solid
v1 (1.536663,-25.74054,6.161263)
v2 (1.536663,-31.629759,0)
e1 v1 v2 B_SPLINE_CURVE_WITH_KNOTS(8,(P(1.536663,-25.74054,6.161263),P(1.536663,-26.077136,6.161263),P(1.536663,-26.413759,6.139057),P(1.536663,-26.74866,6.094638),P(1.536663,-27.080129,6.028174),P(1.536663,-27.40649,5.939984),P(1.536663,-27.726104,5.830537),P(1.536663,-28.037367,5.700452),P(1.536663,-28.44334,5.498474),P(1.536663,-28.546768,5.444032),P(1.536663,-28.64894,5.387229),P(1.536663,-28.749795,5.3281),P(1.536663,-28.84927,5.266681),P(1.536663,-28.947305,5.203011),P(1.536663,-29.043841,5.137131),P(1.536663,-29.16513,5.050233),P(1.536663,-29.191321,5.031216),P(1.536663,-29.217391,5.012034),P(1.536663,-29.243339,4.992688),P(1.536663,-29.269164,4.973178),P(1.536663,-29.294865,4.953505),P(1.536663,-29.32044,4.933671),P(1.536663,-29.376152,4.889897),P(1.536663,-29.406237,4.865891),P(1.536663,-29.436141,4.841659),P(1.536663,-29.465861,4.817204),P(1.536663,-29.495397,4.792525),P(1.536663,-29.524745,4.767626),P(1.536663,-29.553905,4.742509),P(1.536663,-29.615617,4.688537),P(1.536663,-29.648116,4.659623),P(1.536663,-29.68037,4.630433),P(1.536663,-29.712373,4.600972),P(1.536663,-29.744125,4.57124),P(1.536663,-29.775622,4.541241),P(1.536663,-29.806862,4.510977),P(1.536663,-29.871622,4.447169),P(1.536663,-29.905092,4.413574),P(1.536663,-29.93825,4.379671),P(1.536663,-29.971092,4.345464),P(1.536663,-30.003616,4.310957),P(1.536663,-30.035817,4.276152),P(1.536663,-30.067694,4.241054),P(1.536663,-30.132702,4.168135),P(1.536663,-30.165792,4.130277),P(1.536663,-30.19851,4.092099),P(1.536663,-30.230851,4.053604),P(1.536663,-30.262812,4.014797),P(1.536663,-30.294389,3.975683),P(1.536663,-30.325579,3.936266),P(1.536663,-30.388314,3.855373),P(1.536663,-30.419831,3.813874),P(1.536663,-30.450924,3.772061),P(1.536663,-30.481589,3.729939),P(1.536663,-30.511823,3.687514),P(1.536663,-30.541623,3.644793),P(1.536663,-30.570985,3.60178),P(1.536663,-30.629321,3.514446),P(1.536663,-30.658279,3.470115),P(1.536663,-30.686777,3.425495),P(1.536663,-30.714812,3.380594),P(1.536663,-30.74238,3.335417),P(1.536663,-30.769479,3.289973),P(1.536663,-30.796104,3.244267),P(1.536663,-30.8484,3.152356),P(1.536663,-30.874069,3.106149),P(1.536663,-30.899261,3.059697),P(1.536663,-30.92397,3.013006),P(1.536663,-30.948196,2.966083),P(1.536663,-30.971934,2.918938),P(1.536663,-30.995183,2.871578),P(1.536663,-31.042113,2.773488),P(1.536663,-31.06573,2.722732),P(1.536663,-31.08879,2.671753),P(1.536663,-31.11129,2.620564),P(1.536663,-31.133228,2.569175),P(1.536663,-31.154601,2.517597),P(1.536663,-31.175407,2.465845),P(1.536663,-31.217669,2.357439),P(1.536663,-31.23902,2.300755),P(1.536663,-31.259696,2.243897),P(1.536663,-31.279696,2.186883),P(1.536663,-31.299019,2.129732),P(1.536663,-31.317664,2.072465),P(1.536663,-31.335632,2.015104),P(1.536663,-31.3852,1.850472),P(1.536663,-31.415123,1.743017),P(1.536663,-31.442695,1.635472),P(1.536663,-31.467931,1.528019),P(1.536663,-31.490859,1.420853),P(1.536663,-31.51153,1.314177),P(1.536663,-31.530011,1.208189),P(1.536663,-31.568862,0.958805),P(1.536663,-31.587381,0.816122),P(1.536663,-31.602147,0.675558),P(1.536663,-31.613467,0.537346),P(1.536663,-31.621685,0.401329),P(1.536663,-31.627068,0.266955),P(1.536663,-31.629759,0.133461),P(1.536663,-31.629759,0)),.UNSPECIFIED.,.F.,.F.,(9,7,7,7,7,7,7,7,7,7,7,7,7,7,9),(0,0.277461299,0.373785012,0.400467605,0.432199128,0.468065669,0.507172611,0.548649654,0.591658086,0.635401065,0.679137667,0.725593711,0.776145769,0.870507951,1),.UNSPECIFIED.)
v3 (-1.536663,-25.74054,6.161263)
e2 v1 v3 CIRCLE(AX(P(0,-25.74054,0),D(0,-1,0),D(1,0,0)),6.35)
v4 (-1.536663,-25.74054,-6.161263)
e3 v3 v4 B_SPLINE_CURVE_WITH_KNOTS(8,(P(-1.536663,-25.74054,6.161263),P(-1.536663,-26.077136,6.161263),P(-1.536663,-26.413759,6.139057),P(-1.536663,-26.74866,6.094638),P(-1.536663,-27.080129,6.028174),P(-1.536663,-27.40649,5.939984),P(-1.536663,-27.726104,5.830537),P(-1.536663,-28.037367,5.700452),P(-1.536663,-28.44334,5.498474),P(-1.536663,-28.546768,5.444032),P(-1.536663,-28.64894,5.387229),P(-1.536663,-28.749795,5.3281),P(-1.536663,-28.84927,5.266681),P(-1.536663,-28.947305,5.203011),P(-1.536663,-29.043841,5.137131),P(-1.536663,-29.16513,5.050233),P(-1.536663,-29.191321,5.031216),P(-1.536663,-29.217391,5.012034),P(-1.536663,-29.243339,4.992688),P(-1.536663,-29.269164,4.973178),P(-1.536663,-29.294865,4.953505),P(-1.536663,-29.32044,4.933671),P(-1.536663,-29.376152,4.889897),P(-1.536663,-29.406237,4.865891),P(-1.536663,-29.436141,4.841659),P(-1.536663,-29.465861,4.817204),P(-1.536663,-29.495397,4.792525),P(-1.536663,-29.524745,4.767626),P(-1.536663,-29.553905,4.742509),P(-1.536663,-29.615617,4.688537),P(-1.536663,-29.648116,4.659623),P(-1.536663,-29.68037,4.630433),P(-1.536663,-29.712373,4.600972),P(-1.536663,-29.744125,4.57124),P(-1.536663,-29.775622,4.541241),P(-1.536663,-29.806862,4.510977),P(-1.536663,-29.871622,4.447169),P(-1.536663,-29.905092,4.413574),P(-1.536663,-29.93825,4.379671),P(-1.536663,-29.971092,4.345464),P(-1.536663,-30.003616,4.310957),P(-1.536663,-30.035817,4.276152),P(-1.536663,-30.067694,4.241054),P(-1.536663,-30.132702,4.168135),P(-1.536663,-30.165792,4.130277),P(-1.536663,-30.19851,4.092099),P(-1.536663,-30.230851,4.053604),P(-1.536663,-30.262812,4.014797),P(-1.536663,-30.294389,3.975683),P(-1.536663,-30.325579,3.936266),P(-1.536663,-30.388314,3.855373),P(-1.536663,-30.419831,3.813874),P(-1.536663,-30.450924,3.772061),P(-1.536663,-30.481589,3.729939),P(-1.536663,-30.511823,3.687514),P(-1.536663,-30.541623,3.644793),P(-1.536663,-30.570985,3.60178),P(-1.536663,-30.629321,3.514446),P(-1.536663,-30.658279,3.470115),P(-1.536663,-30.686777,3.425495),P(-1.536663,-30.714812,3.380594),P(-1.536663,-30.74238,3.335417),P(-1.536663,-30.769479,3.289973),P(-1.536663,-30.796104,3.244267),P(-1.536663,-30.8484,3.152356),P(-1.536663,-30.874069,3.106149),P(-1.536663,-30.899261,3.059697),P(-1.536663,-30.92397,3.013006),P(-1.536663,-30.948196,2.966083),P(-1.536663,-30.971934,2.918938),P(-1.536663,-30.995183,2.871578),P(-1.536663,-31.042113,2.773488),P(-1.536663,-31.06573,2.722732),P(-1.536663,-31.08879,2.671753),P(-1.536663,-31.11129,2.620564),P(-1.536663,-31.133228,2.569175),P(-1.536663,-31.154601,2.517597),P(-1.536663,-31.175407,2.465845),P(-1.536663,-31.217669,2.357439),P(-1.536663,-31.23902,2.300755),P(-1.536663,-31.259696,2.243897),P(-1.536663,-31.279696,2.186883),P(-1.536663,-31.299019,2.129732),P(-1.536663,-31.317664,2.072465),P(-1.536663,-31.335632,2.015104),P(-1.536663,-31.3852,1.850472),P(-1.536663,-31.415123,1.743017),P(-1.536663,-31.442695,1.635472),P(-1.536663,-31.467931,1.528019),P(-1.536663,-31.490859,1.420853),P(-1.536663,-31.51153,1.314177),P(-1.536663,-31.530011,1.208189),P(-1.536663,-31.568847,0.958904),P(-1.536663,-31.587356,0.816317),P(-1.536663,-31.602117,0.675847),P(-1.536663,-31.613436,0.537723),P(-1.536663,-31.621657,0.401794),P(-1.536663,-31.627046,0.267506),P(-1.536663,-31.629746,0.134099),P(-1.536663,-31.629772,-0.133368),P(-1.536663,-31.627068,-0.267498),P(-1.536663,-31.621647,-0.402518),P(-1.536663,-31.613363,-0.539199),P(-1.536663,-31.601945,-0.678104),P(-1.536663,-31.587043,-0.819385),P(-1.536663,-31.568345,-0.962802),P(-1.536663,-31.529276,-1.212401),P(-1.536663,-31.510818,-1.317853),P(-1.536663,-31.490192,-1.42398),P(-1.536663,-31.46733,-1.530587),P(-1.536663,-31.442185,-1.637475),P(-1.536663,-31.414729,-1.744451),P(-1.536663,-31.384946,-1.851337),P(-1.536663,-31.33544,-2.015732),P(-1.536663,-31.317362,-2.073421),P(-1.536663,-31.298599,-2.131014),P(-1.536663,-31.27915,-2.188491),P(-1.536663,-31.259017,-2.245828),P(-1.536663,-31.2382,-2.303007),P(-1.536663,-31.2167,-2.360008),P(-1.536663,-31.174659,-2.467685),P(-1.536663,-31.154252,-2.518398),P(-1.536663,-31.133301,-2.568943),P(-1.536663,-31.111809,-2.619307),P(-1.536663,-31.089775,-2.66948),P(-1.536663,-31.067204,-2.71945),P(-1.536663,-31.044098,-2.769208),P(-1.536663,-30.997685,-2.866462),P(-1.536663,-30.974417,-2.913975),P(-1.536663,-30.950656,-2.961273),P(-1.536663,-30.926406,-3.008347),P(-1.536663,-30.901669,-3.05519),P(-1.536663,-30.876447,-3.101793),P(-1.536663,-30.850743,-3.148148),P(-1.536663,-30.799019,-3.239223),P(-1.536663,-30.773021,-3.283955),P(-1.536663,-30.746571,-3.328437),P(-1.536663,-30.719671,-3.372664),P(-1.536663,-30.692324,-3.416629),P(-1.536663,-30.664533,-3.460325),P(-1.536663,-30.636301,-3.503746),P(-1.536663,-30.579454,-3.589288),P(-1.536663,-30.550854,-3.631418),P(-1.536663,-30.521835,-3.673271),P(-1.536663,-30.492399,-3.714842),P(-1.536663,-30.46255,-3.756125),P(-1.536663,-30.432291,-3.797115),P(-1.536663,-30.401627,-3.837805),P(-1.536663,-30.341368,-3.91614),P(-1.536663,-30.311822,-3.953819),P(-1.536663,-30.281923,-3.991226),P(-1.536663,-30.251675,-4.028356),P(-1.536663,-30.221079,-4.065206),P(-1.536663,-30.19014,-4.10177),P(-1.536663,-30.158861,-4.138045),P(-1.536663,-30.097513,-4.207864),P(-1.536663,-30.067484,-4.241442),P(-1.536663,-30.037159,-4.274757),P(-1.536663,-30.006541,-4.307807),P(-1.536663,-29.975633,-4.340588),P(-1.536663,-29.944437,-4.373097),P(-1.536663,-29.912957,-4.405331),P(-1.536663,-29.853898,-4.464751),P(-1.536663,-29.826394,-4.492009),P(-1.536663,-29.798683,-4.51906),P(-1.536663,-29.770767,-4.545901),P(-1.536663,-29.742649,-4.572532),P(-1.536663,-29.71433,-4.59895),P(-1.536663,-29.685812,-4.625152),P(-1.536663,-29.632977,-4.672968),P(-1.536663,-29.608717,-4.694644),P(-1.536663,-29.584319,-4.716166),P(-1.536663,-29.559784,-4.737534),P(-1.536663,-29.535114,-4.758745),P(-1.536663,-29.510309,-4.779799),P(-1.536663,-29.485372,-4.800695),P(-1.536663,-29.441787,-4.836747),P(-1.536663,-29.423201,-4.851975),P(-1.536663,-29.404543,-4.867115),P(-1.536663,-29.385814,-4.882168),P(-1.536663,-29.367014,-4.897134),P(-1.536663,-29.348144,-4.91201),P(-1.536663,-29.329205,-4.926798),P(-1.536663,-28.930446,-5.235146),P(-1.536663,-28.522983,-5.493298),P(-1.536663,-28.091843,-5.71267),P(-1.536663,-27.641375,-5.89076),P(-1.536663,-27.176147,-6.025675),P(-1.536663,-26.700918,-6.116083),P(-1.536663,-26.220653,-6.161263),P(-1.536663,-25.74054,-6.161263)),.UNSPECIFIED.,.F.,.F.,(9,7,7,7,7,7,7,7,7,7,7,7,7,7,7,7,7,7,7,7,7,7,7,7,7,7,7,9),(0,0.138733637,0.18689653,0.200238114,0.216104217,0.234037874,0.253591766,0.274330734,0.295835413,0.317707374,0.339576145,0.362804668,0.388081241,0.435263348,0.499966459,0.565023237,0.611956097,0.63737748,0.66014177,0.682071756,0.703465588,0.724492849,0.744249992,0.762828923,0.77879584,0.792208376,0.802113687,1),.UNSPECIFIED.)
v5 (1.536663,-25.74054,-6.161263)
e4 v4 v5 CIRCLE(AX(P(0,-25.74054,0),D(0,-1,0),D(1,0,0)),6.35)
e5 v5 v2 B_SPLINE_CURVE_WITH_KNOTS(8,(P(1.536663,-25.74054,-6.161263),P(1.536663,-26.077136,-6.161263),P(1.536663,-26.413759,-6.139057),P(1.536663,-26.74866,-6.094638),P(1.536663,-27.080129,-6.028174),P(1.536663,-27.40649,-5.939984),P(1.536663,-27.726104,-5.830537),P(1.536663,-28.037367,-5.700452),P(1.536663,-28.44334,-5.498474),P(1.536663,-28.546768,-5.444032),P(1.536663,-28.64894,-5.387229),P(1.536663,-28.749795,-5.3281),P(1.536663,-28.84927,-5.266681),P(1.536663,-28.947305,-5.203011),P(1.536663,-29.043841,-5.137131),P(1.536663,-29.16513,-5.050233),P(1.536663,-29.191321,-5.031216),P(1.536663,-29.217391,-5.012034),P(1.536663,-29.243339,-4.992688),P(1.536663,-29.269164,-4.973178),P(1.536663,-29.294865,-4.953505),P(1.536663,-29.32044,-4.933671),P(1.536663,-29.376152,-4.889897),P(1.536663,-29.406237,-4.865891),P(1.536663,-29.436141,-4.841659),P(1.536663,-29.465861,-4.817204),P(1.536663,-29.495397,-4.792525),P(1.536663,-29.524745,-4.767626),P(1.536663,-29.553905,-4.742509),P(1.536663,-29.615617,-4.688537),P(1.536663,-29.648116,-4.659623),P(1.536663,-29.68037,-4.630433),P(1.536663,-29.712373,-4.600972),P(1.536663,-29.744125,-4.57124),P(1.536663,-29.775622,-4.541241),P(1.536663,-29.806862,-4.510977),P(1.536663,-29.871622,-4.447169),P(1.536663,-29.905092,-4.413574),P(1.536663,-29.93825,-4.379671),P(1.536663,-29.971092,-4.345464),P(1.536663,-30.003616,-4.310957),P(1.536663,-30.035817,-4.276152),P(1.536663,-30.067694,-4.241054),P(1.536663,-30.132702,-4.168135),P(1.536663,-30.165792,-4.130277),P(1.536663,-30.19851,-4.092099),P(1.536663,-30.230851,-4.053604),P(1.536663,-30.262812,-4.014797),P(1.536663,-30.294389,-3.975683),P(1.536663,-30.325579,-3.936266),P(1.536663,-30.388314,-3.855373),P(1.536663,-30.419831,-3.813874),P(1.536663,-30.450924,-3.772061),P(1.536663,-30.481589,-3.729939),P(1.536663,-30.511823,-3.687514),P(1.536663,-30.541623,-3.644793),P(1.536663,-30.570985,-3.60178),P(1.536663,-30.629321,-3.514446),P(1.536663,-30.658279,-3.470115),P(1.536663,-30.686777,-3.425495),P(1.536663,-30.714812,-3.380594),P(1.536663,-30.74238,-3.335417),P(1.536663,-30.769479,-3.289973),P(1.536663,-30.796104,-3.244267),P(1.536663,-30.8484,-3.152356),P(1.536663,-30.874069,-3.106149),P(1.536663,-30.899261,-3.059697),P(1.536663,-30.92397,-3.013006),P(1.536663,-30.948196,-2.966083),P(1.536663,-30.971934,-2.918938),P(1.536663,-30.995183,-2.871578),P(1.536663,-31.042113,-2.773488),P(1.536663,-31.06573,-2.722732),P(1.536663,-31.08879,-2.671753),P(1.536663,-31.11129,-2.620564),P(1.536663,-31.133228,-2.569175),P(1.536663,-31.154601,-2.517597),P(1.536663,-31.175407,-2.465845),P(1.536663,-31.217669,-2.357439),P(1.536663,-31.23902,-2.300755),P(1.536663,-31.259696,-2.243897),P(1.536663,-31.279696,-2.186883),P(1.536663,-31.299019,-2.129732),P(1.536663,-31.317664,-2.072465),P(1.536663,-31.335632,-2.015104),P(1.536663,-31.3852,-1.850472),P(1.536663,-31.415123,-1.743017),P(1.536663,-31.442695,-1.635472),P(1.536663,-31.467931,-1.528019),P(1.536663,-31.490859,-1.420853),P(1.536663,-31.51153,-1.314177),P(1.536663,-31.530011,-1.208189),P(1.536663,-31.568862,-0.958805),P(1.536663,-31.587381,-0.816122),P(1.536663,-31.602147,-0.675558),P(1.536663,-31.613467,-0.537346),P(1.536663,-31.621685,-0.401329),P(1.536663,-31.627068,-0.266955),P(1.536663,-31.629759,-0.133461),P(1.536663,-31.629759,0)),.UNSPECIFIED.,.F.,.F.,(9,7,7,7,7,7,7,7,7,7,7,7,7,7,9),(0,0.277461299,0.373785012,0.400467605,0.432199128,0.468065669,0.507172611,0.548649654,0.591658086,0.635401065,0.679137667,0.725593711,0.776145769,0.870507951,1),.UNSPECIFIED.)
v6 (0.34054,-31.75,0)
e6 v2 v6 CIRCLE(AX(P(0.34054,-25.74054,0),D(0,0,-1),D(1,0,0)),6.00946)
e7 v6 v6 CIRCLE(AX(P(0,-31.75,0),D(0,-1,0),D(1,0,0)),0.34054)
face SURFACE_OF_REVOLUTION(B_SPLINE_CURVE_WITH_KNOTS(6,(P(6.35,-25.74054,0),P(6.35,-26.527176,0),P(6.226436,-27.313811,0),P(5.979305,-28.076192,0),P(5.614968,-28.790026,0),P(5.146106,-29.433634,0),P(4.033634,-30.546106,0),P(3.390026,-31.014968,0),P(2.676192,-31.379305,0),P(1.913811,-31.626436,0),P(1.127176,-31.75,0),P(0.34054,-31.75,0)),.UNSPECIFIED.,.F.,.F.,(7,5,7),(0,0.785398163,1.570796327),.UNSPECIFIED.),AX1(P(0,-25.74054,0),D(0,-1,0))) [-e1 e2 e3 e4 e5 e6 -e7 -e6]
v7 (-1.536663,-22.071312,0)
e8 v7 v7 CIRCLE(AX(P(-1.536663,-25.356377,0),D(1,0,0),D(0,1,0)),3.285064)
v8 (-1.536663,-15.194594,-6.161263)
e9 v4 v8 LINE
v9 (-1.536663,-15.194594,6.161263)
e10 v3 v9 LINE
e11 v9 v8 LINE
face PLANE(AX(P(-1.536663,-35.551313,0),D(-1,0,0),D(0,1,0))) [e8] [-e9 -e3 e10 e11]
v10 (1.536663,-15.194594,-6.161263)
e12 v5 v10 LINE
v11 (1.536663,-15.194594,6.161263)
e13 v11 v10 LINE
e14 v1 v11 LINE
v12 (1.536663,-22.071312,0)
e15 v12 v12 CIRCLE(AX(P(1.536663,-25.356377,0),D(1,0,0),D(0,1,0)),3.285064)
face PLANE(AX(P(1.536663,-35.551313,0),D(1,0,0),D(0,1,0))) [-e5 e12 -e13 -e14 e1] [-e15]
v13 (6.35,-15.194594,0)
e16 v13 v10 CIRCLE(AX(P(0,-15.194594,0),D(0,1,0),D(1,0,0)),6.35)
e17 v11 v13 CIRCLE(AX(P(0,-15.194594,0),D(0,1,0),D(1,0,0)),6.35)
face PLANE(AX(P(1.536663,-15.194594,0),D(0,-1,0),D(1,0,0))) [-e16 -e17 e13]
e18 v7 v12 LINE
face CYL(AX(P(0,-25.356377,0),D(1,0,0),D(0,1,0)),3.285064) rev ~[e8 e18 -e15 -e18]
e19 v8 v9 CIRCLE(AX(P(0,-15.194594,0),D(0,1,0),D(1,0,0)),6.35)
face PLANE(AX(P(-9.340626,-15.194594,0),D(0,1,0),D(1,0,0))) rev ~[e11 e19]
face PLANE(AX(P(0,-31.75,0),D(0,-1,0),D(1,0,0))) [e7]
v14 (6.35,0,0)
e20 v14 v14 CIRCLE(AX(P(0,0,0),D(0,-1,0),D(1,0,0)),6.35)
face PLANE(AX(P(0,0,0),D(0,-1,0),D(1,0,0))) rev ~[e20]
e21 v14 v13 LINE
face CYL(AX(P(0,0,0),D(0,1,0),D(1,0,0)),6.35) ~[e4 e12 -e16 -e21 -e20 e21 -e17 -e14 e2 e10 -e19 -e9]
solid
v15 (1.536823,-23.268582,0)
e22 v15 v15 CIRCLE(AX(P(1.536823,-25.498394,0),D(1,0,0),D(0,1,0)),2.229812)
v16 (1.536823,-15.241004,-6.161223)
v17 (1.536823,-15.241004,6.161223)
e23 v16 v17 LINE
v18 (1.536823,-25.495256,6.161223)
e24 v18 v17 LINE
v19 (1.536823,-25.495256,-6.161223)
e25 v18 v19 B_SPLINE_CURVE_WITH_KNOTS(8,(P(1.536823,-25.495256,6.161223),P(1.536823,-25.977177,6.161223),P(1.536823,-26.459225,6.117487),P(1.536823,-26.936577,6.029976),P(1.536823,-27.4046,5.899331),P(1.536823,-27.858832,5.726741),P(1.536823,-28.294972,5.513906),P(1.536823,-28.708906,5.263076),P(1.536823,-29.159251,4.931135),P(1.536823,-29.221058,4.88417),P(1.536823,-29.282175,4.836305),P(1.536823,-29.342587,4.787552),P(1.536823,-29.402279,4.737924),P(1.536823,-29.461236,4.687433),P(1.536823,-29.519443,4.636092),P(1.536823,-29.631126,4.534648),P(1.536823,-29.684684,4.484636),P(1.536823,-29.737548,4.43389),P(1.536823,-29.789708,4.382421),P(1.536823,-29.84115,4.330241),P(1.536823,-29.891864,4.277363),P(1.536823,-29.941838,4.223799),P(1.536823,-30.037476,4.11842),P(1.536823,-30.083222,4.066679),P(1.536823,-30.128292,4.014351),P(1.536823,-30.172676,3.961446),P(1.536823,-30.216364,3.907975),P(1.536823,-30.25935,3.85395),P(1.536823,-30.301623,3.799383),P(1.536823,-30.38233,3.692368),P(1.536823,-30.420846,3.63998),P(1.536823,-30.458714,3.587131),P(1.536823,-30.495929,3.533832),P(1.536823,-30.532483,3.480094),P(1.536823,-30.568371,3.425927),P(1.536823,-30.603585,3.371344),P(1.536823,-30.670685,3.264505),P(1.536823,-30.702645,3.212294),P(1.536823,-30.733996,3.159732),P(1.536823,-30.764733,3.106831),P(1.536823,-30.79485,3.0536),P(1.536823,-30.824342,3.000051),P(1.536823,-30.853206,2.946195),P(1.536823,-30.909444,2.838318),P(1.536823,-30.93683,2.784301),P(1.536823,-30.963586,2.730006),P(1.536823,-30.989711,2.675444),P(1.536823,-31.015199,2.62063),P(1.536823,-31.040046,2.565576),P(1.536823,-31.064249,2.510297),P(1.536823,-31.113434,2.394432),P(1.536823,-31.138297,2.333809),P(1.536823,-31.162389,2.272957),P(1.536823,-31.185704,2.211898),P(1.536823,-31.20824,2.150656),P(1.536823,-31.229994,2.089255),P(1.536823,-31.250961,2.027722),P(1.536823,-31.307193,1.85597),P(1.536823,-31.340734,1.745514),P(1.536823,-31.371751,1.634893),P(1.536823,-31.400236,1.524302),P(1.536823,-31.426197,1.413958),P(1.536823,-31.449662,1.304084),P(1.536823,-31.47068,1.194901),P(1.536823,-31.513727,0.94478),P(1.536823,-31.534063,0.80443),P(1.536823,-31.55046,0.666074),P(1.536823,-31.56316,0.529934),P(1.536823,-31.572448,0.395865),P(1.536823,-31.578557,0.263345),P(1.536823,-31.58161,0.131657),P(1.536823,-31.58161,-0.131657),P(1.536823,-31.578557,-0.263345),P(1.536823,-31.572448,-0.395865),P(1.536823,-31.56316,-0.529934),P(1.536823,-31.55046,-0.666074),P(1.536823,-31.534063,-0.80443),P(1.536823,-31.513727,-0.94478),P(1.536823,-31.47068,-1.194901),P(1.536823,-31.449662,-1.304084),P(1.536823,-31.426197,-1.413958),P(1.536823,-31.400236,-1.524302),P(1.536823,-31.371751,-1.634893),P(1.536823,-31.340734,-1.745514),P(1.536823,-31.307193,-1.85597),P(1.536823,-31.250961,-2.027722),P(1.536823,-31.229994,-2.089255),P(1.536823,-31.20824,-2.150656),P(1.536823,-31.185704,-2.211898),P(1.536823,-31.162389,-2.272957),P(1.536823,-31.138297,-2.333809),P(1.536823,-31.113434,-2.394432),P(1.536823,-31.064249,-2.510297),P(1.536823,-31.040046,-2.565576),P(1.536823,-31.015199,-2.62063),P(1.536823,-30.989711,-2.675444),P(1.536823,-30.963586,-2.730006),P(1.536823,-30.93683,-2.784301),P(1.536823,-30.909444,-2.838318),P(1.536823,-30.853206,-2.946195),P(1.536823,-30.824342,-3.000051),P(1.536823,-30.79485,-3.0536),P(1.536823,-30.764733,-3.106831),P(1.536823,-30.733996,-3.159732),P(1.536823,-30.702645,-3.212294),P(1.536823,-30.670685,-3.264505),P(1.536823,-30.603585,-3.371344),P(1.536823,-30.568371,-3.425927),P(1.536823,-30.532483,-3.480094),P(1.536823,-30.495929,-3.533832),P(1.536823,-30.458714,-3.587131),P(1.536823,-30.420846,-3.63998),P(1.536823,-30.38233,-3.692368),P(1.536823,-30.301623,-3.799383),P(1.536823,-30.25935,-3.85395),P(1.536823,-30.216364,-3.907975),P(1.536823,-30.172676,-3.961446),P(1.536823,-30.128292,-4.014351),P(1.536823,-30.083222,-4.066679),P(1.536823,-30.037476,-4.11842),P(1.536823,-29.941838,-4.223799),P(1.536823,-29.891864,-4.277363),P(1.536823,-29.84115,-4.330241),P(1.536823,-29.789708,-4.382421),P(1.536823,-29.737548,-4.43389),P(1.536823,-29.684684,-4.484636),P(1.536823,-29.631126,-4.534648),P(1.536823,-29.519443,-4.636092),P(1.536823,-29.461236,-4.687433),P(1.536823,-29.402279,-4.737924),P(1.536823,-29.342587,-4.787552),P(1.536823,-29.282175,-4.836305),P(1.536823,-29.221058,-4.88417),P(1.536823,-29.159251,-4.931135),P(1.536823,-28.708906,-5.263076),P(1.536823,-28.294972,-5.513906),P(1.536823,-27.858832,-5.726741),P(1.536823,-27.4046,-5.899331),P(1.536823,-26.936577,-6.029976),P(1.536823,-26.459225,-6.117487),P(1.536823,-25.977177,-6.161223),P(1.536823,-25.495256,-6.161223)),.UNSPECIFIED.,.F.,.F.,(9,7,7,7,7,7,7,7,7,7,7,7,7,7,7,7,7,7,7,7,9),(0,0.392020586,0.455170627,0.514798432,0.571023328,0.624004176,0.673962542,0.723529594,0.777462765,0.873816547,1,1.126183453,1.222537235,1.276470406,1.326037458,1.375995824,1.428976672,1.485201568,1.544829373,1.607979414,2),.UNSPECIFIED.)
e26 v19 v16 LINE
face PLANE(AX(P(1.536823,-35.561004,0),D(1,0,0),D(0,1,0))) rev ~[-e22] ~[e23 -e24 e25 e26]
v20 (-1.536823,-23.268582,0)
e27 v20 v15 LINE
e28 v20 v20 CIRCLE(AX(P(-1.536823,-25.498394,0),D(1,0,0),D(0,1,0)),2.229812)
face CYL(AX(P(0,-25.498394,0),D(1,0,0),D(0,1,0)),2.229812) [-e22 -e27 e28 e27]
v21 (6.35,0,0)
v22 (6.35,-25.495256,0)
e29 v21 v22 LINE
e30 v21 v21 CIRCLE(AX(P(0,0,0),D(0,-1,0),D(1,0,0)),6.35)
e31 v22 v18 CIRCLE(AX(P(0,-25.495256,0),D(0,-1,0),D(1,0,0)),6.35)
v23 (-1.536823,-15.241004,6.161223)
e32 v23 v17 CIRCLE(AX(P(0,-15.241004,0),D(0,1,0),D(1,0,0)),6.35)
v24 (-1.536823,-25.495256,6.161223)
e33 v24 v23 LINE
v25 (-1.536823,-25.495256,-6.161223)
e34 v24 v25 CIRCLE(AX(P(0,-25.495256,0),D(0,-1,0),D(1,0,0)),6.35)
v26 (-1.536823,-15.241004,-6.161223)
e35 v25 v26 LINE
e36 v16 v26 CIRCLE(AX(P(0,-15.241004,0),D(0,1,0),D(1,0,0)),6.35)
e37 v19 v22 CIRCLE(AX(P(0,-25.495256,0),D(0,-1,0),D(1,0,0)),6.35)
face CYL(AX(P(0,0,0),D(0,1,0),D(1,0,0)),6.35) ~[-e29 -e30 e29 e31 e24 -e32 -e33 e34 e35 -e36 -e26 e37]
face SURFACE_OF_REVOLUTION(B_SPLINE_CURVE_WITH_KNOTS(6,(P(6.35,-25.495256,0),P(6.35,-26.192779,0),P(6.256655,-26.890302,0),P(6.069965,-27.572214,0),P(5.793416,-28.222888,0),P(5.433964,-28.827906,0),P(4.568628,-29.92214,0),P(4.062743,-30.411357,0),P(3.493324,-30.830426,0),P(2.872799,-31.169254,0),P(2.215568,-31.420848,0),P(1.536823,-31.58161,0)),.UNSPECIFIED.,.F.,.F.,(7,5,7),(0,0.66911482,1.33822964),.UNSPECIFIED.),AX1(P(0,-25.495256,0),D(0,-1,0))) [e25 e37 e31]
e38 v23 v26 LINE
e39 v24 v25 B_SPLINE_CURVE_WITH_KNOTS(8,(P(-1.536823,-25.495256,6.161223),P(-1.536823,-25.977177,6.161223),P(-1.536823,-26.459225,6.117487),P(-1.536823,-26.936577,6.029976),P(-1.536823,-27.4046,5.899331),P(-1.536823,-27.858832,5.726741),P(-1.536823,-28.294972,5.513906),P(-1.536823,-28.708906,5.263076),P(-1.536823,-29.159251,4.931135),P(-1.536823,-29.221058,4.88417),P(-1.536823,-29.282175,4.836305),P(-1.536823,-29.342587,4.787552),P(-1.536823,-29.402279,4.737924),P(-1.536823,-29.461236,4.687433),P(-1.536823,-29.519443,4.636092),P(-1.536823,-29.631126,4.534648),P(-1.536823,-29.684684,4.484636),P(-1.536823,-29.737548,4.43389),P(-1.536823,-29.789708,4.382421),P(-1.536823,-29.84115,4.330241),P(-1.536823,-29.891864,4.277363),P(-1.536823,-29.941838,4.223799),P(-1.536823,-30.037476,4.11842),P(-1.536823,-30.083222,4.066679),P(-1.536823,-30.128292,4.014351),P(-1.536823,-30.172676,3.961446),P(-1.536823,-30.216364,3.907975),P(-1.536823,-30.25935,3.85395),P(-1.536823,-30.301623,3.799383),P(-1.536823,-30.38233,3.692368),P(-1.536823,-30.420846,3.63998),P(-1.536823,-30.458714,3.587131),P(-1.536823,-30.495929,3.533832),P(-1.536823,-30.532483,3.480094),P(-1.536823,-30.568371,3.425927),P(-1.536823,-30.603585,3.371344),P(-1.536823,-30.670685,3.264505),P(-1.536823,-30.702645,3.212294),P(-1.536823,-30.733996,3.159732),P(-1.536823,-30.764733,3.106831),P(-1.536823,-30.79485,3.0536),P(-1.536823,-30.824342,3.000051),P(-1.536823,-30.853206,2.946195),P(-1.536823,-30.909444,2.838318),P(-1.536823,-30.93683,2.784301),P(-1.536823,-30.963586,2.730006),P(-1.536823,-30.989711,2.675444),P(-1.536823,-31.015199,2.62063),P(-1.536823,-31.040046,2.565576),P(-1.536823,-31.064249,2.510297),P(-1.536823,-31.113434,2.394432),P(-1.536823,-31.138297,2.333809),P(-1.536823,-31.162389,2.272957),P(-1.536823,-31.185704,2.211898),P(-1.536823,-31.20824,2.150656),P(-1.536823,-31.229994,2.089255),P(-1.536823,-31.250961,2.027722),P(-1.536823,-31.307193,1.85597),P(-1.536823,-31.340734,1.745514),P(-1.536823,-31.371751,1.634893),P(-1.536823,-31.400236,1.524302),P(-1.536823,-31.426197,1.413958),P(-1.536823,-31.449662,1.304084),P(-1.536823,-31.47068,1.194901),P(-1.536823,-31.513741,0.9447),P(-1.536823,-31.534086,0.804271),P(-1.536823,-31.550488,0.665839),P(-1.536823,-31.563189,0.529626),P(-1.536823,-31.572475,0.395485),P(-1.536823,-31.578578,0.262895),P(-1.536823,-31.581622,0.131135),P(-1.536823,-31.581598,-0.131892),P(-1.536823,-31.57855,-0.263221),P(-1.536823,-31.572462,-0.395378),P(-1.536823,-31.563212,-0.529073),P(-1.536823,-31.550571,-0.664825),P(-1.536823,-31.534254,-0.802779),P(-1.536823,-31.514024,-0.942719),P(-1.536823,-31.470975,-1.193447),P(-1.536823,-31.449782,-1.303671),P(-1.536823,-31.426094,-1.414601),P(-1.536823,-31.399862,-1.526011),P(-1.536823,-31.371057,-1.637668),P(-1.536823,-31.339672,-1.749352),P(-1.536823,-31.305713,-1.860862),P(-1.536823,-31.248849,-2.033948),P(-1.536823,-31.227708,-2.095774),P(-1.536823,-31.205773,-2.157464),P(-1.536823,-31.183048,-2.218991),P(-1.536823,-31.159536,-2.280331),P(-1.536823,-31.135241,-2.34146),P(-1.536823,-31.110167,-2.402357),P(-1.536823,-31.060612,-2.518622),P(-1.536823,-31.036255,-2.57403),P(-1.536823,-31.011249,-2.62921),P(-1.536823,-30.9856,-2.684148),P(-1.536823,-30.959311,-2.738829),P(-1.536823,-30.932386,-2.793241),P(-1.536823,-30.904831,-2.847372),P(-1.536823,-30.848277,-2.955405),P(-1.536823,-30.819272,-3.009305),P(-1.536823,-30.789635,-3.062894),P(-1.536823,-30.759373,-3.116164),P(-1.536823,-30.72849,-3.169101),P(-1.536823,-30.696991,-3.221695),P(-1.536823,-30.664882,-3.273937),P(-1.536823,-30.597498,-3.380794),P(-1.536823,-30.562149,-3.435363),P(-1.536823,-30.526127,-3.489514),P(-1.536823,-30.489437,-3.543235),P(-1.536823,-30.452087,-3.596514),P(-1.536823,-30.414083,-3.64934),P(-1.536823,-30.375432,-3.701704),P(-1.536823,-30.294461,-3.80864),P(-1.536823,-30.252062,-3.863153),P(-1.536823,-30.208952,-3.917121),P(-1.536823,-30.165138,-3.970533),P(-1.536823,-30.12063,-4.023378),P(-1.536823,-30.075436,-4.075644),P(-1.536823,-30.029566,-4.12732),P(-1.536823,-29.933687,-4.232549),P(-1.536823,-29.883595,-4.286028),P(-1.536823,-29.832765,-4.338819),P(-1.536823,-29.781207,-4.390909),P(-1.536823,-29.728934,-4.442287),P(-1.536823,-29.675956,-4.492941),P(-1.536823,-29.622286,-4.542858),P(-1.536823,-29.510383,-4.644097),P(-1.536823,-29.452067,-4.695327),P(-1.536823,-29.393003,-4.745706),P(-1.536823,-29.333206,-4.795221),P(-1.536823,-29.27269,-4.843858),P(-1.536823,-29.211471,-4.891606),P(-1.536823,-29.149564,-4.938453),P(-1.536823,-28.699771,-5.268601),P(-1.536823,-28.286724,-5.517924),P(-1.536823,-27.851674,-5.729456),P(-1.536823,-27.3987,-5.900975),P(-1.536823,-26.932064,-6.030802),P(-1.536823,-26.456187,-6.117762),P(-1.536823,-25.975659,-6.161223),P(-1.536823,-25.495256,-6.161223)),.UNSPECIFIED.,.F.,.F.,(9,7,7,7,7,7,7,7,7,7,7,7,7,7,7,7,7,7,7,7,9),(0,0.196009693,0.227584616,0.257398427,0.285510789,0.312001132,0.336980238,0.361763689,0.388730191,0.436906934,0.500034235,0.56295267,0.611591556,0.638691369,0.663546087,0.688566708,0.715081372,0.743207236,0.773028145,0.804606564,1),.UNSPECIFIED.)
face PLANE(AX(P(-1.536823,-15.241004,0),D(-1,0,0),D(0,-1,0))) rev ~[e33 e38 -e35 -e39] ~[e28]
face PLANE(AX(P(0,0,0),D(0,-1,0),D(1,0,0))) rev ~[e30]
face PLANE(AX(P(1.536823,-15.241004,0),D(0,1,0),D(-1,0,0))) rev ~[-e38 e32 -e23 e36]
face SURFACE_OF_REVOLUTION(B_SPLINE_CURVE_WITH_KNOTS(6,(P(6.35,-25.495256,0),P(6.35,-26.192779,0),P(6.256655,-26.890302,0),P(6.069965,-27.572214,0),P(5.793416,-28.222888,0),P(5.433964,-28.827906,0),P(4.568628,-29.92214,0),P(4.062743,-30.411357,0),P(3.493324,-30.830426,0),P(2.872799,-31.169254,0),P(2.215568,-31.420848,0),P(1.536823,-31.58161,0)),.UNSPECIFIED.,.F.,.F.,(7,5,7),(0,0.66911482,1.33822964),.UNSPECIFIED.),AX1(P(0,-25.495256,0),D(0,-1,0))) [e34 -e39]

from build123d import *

# Parameters (mm, degrees)
F0_R      = 6.35
F1_DEPTH  = 31.75
F2_R      = 6.2547444974
F3_W      = 1.5368231577
F3_H      = 10.16
F4_DEPTH  = 23.1394
F5_R      = 2.2298122128
F6_DEPTH  = 2.5146
F8_DEPTH  = 31.75
F9_R      = 6.0094603995
F7_W      = 7.8039629152
F7_H      = 20.3567193821
F10_DEPTH = 12.7
F11_R     = 3.2850641109
F12_DEPTH = 19.2278


# Not quite as in the source:
# - a feature names something its author has since deleted; it is built from what else it names


with BuildPart() as f1:
    # F0 (on Front) → F1 (new body)
    with BuildSketch(Plane.XZ):
        Circle(F0_R)
    extrude(amount=F1_DEPTH)

    # F2
    f2_edges = [f1.edges().sort_by_distance(p)[0] for p in [
        (-6.35, -31.75, 0),
    ]]
    fillet(f2_edges, radius=F2_R)

    # F3 (on Top) → F4 (cut, symmetric)
    with BuildSketch(Plane.XY):
        with Locations((-0.7684115789, -30.4810036588)):
            Rectangle(F3_W, F3_H)
        with Locations((0.7684115789, -30.4810036588)):
            Rectangle(F3_W, F3_H)
        with Locations((0.7684115789, -20.3210036588)):
            Rectangle(F3_W, F3_H)
        with Locations((-0.7684115789, -20.3210036588)):
            Rectangle(F3_W, F3_H)
    extrude(amount=F4_DEPTH, both=True, mode=Mode.SUBTRACT)

    # F5 (on Right) → F6 (join, symmetric)
    with BuildSketch(Plane.YZ):
        with Locations((-25.498393923, 0)):
            Circle(F5_R)
    extrude(amount=F6_DEPTH, both=True)


with BuildPart() as f8:
    # F0 (on Front) → F8 (new body)
    with BuildSketch(Plane.XZ):
        Circle(F0_R)
    extrude(amount=F8_DEPTH)

    # F9
    f9_edges = [f8.edges().sort_by_distance(p)[0] for p in [
        (-6.35, -31.75, 0),
    ]]
    fillet(f9_edges, radius=F9_R)

    # F7 (on Top) → F10 (cut, symmetric)
    with BuildSketch(Plane.XY):
        with Locations((-5.43864473, -25.3729536198)):
            Rectangle(F7_W, F7_H)
        with Locations((5.43864473, -25.3729536198)):
            Rectangle(F7_W, F7_H)
    extrude(amount=F10_DEPTH, both=True, mode=Mode.SUBTRACT)

    # F11 (on Right) → F12 (cut, symmetric)
    with BuildSketch(Plane.YZ):
        with Locations((-25.3563765436, 0)):
            Circle(F11_R)
    extrude(amount=F12_DEPTH, both=True, mode=Mode.SUBTRACT)


solid = Compound([f1.part, f8.part])
